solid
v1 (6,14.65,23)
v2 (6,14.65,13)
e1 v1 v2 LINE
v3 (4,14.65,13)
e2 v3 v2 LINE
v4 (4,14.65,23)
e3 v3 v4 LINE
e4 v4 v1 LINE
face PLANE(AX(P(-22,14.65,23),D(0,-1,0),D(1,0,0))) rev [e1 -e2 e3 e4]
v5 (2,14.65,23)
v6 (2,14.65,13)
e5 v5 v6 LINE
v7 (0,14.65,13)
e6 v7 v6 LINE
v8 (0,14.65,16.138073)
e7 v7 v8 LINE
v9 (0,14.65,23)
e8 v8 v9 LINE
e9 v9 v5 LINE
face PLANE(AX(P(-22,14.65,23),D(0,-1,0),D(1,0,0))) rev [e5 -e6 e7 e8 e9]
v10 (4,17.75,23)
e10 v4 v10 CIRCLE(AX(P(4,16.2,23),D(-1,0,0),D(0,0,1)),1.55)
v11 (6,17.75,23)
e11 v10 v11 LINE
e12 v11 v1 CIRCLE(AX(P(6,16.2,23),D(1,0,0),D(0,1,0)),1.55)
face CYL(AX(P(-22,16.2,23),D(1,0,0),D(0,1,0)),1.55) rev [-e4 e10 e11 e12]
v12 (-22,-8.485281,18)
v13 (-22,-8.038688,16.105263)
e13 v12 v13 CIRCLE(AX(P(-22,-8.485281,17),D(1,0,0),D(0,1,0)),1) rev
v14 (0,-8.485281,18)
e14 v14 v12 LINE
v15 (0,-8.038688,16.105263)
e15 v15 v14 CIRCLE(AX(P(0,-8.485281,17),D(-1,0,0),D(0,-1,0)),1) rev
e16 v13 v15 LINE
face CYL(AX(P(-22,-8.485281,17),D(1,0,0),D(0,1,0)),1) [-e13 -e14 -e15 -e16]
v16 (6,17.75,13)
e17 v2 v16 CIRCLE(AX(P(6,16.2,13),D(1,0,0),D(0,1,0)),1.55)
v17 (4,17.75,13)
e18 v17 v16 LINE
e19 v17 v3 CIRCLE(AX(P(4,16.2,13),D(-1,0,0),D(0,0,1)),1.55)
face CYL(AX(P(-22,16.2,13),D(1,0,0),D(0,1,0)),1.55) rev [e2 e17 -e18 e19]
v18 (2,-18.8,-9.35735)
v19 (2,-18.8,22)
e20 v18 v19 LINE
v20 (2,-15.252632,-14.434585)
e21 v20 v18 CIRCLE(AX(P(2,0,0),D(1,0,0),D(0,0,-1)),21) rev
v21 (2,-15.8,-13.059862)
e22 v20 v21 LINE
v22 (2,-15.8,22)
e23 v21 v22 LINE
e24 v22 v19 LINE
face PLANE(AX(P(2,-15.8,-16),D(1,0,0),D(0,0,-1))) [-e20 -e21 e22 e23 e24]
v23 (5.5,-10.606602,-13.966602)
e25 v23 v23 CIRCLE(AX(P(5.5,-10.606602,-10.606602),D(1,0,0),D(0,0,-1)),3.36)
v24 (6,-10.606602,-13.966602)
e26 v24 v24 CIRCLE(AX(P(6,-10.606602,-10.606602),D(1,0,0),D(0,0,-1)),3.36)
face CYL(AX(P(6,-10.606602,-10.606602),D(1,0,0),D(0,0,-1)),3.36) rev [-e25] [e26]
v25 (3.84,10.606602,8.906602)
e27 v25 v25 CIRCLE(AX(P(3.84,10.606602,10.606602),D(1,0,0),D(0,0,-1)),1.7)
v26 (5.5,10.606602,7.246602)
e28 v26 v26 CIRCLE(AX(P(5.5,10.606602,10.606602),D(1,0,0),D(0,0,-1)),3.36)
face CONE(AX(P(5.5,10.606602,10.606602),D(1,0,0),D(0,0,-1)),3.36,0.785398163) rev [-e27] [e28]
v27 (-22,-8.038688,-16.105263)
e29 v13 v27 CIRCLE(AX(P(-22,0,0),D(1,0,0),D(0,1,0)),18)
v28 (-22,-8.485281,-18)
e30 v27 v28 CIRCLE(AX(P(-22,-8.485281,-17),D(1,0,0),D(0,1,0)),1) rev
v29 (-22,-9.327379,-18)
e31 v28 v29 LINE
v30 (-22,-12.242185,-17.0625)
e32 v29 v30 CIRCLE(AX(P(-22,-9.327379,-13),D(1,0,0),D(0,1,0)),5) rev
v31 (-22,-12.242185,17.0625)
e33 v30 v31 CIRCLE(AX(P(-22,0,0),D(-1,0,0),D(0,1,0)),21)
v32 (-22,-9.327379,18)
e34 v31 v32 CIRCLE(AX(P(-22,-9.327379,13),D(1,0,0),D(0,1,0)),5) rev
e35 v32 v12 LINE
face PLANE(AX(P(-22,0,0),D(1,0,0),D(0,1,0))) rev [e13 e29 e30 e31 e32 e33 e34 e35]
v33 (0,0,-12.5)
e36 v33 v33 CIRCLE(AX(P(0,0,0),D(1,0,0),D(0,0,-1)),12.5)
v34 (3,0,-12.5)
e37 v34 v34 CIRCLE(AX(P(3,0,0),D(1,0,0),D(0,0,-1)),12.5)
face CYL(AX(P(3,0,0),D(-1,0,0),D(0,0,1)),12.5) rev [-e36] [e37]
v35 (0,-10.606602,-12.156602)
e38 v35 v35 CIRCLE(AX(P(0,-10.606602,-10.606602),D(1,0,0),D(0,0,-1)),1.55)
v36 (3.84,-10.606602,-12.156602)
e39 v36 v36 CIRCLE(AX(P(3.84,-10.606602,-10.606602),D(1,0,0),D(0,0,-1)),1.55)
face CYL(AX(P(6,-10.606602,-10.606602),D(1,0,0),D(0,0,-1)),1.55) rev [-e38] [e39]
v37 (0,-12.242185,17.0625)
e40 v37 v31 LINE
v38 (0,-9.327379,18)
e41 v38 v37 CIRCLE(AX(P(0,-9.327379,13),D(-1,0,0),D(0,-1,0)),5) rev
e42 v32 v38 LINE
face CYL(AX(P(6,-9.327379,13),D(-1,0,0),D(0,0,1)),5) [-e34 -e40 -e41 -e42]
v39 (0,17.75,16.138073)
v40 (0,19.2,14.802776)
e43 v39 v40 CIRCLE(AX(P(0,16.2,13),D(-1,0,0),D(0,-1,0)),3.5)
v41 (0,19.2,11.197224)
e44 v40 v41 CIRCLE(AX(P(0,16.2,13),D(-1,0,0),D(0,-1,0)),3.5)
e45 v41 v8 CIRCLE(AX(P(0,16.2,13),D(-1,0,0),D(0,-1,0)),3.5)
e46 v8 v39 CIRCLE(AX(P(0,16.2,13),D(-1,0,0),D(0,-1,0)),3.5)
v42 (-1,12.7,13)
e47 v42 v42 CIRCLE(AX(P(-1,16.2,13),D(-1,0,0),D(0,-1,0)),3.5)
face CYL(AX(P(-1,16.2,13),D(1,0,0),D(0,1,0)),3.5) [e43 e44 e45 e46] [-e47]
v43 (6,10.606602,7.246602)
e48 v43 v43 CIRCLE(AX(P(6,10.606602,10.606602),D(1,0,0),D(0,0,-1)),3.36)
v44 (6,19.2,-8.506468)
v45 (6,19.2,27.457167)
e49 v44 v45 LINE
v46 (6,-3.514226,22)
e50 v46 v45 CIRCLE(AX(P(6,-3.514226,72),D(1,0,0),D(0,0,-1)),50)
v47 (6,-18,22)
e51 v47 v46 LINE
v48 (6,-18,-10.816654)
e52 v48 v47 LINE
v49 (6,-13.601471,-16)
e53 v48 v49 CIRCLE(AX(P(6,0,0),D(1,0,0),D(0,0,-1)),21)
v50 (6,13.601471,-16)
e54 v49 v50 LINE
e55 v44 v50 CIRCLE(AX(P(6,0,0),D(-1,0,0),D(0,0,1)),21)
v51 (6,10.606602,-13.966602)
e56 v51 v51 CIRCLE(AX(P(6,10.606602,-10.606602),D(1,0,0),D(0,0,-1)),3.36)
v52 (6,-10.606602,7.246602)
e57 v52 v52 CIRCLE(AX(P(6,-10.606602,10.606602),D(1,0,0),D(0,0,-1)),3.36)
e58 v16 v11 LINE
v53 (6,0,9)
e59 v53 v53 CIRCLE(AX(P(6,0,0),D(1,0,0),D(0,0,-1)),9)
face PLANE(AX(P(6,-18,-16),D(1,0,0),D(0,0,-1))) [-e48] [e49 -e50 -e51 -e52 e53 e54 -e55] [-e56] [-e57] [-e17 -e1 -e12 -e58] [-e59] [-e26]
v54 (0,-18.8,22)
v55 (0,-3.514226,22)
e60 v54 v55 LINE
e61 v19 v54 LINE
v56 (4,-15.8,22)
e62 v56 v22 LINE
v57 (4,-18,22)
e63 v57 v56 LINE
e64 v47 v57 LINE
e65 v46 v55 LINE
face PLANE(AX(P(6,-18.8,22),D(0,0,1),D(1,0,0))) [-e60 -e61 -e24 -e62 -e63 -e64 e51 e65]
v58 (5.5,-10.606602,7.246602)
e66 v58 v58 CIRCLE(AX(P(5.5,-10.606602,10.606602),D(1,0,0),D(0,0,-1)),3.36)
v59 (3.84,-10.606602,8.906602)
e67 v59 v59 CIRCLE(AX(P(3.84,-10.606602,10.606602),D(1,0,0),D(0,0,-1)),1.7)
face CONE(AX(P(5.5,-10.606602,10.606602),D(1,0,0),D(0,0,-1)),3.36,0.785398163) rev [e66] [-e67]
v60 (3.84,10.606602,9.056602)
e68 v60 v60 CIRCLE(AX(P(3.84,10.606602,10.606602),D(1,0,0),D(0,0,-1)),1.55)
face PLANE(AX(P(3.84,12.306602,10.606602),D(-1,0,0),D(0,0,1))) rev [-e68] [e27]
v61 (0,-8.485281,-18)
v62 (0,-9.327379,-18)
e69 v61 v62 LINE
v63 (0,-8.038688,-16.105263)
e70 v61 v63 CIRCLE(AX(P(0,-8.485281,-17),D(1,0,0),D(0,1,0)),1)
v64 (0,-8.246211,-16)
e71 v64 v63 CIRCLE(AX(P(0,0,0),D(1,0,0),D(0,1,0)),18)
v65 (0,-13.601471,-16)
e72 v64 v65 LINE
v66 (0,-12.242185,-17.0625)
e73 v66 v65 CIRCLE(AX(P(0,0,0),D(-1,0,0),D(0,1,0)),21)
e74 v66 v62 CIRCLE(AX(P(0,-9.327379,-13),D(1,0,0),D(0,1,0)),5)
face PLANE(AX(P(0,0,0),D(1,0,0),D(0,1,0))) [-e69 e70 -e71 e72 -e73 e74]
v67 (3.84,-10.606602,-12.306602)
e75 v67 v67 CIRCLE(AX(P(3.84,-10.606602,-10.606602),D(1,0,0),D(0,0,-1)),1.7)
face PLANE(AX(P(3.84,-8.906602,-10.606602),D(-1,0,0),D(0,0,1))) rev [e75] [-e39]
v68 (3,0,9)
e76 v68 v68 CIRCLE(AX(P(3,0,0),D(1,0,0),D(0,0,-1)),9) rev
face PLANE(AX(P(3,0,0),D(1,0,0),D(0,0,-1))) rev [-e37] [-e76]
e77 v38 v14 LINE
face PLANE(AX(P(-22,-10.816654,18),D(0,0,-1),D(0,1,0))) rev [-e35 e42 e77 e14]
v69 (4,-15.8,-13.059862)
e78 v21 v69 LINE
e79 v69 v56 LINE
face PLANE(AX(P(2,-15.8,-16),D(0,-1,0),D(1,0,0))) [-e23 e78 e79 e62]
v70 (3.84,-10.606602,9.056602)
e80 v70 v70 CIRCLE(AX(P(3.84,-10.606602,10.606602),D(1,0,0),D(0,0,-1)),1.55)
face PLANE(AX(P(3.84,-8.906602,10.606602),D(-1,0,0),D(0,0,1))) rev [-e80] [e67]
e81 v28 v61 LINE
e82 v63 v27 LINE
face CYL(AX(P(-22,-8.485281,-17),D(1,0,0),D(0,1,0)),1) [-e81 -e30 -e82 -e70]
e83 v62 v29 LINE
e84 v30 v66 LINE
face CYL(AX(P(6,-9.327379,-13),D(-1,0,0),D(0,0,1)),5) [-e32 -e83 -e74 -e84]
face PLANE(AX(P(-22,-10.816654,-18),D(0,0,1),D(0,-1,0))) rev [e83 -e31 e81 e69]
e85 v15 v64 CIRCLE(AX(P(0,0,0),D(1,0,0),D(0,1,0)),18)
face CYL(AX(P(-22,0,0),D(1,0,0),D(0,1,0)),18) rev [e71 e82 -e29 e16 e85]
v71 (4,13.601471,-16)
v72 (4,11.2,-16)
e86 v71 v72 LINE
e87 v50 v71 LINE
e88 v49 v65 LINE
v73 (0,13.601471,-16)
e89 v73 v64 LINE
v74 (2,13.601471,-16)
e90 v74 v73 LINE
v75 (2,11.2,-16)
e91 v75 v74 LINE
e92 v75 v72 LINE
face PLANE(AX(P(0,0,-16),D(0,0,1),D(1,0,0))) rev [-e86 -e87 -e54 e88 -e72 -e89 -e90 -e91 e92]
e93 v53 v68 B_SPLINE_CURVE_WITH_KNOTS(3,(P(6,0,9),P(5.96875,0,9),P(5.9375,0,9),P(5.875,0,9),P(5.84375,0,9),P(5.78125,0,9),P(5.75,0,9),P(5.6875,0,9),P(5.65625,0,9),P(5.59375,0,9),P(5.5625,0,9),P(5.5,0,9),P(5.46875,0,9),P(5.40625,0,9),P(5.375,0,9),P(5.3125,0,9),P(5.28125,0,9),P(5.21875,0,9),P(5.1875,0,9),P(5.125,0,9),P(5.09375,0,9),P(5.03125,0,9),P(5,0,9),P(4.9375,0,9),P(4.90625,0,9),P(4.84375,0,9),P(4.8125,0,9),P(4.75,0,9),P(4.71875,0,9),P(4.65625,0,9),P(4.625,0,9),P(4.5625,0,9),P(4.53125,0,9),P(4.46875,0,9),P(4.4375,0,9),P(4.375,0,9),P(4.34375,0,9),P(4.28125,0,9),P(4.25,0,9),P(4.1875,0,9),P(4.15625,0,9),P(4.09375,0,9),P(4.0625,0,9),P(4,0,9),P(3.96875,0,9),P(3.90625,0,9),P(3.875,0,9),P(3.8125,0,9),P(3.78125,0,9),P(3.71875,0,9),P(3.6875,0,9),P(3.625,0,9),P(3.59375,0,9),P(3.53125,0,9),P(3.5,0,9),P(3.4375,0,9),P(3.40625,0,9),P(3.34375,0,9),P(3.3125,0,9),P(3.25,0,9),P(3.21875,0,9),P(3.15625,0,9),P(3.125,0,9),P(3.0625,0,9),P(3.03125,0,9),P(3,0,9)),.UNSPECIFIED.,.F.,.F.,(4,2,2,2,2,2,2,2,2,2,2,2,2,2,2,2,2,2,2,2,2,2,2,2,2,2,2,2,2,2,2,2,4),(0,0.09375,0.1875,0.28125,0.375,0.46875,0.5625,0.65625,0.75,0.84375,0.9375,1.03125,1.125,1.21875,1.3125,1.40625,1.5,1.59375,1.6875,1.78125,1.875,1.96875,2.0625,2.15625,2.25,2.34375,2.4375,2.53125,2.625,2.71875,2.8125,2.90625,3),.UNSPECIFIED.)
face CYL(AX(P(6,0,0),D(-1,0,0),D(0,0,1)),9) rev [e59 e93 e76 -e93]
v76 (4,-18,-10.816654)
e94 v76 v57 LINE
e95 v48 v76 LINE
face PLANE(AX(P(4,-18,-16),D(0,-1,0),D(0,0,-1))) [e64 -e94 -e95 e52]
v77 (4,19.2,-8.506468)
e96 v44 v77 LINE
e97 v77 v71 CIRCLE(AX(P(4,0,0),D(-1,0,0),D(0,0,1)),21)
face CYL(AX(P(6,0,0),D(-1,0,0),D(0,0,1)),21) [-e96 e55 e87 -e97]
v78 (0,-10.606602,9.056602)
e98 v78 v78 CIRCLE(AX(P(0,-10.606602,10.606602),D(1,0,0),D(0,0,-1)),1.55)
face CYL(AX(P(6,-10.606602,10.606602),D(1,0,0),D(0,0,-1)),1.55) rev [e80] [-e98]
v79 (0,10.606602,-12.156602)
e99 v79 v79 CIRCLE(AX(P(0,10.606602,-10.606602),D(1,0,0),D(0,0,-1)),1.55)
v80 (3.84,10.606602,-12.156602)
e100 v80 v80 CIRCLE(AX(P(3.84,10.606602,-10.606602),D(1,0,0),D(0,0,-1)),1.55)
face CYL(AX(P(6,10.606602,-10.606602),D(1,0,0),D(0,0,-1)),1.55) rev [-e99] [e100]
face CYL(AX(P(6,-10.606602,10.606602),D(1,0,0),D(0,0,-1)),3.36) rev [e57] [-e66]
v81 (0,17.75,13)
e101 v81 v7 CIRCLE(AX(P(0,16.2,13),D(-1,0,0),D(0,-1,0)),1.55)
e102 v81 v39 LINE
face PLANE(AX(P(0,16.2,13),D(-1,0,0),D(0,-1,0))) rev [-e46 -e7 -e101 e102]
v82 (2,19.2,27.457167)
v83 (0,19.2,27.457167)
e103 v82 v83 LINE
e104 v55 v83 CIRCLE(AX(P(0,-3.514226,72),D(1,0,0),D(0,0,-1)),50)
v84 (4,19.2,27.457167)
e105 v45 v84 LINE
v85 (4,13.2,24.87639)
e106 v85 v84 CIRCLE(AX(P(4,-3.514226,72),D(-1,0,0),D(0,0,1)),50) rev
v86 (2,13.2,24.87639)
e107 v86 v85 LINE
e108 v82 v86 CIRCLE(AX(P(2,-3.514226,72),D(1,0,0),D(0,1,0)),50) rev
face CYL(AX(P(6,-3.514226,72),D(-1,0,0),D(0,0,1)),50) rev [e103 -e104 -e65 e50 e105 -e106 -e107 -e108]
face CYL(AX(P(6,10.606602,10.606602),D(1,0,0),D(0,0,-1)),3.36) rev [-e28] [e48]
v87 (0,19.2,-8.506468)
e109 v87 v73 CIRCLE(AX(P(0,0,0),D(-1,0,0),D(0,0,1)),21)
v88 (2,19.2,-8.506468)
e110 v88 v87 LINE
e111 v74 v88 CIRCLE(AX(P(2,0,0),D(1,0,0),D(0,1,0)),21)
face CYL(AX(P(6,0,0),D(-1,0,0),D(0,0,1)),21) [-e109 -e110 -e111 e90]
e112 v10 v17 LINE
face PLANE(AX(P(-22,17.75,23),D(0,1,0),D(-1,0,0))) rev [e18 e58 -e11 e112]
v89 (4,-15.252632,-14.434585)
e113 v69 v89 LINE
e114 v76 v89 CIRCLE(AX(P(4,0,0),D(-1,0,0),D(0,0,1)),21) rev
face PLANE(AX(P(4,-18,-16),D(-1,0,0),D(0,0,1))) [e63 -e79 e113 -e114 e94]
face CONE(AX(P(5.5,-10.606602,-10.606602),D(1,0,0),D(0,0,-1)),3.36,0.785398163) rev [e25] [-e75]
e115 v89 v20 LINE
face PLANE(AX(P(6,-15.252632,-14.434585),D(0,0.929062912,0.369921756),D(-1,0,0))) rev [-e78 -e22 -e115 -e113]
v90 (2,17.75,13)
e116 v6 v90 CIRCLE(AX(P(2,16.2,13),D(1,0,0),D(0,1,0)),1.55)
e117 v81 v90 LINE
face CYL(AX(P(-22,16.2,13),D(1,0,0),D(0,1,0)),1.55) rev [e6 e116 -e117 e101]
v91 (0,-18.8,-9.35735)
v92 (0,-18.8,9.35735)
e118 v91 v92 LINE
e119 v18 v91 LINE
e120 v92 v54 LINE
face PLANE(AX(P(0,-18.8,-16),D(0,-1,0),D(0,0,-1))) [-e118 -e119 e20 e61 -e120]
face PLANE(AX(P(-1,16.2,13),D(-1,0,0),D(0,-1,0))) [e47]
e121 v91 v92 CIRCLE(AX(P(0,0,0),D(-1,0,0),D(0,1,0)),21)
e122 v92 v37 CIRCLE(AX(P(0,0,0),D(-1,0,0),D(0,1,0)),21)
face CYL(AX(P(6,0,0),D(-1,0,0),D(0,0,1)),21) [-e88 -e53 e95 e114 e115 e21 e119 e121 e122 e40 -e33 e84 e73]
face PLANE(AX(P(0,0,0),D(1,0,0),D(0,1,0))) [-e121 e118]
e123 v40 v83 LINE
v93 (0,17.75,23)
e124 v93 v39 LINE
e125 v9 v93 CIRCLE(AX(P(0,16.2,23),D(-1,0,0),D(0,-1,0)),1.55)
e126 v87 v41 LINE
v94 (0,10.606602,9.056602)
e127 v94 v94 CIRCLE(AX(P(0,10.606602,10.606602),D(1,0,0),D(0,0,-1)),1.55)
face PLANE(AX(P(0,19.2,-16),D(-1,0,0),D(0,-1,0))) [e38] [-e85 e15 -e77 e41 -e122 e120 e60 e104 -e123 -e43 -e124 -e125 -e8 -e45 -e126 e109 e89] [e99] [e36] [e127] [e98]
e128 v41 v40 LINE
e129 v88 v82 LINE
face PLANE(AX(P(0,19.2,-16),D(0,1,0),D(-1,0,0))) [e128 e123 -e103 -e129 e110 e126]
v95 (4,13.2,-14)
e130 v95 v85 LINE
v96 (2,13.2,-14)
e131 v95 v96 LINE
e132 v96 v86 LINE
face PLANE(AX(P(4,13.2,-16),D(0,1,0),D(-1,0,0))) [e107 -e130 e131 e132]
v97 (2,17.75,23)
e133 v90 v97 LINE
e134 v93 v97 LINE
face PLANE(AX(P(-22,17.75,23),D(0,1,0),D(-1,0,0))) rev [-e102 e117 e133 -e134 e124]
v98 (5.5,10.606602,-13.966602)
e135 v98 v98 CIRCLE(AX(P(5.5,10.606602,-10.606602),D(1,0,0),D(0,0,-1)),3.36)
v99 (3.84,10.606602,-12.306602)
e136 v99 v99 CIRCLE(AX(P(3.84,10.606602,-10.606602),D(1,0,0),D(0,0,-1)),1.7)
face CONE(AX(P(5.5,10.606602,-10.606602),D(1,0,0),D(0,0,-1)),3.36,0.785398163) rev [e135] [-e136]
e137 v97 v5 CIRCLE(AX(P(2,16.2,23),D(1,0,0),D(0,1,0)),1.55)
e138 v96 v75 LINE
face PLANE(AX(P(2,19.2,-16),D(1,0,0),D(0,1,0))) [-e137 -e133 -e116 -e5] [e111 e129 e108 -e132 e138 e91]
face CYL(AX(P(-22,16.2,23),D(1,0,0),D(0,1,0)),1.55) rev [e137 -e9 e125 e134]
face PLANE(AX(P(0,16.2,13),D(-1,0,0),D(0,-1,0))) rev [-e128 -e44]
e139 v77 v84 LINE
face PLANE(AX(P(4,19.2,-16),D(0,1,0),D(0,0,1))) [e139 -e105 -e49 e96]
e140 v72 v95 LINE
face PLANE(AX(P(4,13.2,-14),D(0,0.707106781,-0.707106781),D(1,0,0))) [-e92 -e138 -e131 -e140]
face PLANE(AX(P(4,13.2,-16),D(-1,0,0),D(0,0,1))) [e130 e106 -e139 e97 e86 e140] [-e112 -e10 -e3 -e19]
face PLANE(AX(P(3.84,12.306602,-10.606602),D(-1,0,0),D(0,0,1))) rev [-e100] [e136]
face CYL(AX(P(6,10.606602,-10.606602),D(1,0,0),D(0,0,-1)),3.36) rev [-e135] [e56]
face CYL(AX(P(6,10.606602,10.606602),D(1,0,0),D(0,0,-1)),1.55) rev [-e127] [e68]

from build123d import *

# Parameters (mm, degrees)
DODANIE_WYCI_GNI_CIE1_START = 27.457167
DODANIE_WYCI_GNI_CIE1_DEPTH = 43.457167
SZKIC2_OUTSIDE_W            = 57.065
SZKIC2_OUTSIDE_H            = 51.608
WYTNIJ_WYCI_GNI_CIE1_DEPTH  = 35.037273975
SZKIC2_4_R                  = 12.5
SZKIC2_4_R_2                = 9
WYTNIJ_WYCI_GNI_CIE2_DEPTH  = 3
SZKIC2_5_R                  = 9
WYTNIJ_WYCI_GNI_CIE3_DEPTH  = 35.037274287
SFAZOWANIE1_SIZE            = 2
DODANIE_WYCI_GNI_CIE2_START = 22
DODANIE_WYCI_GNI_CIE2_DEPTH = 22
ZAOKR_GLENIE1_START         = -22
ZAOKR_GLENIE1_DEPTH         = 22
WYTNIJ_WYCI_GNI_CIE4_DEPTH  = 45.484784375
SZKIC8_R                    = 3.5
DODANIE_WYCI_GNI_CIE3_DEPTH = 1


with BuildPart() as part:
    # Szkic1 → Dodanie-wyciągnięcie1 (new body)
    with BuildSketch(Plane.XY.offset(DODANIE_WYCI_GNI_CIE1_START)):
        Polygon((4, 13.2), (2, 13.2), (2, 19.2), (0, 19.2), (0, -18.8), (2, -18.8), (2, -15.8), (4, -15.8), (4, -18), (6, -18), (6, 19.2), (4, 19.2), align=None)
    extrude(amount=-DODANIE_WYCI_GNI_CIE1_DEPTH)

    # Szkic2 outside → Wytnij-wyciągnięcie1 (cut, through all)
    with BuildSketch(Plane(origin=(0, 0, 0), x_dir=(0, 0, -1), z_dir=(1, 0, 0))):
        with Locations((-5.7285, 0.2)):
            Rectangle(SZKIC2_OUTSIDE_W, SZKIC2_OUTSIDE_H)
        with BuildLine():
            Line((-22, -18.8), (-22, -3.514226))
            ThreePointArc((-22, -3.514226), (-23.38343065, 8.166064436), (-27.457167387, 19.2))
            Line((-27.457167387, 19.2), (8.506468127, 19.2))
            ThreePointArc((8.506468127, 19.2), (12.568915153, 16.823268763), (16, 13.601470509))
            Line((16, 13.601470509), (16, -13.601470509))
            ThreePointArc((16, -13.601470509), (12.942371407, -16.537684915), (9.357350052, -18.8))
            Line((9.357350052, -18.8), (-22, -18.8))
        make_face(mode=Mode.SUBTRACT)
    extrude(amount=WYTNIJ_WYCI_GNI_CIE1_DEPTH, mode=Mode.SUBTRACT)

    # Szkic2<4> → Wytnij-wyciągnięcie2 (cut)
    with BuildSketch(Plane(origin=(0, 0, 0), x_dir=(0, 0, -1), z_dir=(1, 0, 0))):
        Circle(SZKIC2_4_R)
        Circle(SZKIC2_4_R_2, mode=Mode.SUBTRACT)
    extrude(amount=WYTNIJ_WYCI_GNI_CIE2_DEPTH, mode=Mode.SUBTRACT)

    # Szkic2<5> → Wytnij-wyciągnięcie3 (cut, through all)
    with BuildSketch(Plane(origin=(0, 0, 0), x_dir=(0, 0, -1), z_dir=(1, 0, 0))):
        with Locations(Location((0, 0, 0), (0, 0, 180))):
            Circle(SZKIC2_5_R)
    extrude(amount=WYTNIJ_WYCI_GNI_CIE3_DEPTH, mode=Mode.SUBTRACT)

    # Sfazowanie1
    # the kernel refuses this chamfer: 2 mm, written as the material it takes off along each edge
    with BuildSketch(Plane(origin=(4, 13.2, -16), x_dir=(0, 0, 1), z_dir=(-1, 0, 0))) as sfazowanie1_piece_1:
        Polygon((SFAZOWANIE1_SIZE, 0), (0, -SFAZOWANIE1_SIZE), (0, 0), align=None)
    extrude(amount=2, mode=Mode.SUBTRACT)
    with BuildSketch(Plane(origin=(4, -15.8, -13.833293173), x_dir=(0, 0, 1), z_dir=(-1, 0, 0))) as sfazowanie1_piece_2:
        with BuildLine():
            Line((0.773430999, 0), (-0.601291335, 0.547368421))
            ThreePointArc((-0.601291335, 0.547368421), (-0.33094721, 0.295991022), (0, 0))
            Line((0, 0), (0.773430999, 0))
        make_face()
    extrude(amount=2, mode=Mode.SUBTRACT)

    # Szkic3 → Dodanie-wyciągnięcie2 (add)
    with BuildSketch(Plane.ZY.offset(DODANIE_WYCI_GNI_CIE2_START)):
        with BuildLine():
            Line((-18, -10.816653826), (-18, 0))
            ThreePointArc((-18, 0), (0, -18), (18, 0))
            Line((18, 0), (18, -10.816653826))
            ThreePointArc((18, -10.816653826), (0, -21), (-18, -10.816653826))
        make_face()
    extrude(amount=-DODANIE_WYCI_GNI_CIE2_DEPTH)

    # Zaokrąglenie1: read off the stored shape, not the designer's step
    # Zaokrąglenie1 outline → Zaokrąglenie1 (cut)
    with BuildSketch(Plane.YZ.offset(ZAOKR_GLENIE1_START)):
        with BuildLine():
            Line((-10.816653826, -18), (-9.327379053, -18))
            ThreePointArc((-9.327379053, -18), (-10.858310142, -17.759858191), (-12.242185007, -17.0625))
            ThreePointArc((-12.242185007, -17.0625), (-11.538944434, -17.545733423), (-10.816653826, -18))
        make_face()
        with BuildLine():
            ThreePointArc((-8.038687618, -16.105263158), (-7.511952847, -17.229415734), (-8.485281374, -18))
            Line((-8.485281374, -18), (0, -18))
            ThreePointArc((0, -18), (-4.12948321, -17.519913482), (-8.038687618, -16.105263158))
        make_face()
        with BuildLine():
            ThreePointArc((-10.816653826, 18), (-11.538944434, 17.545733423), (-12.242185007, 17.0625))
            ThreePointArc((-12.242185007, 17.0625), (-10.858310142, 17.759858191), (-9.327379053, 18))
            Line((-9.327379053, 18), (-10.816653826, 18))
        make_face()
        with BuildLine():
            ThreePointArc((-8.485281374, 18), (-7.511952847, 17.229415734), (-8.038687618, 16.105263158))
            ThreePointArc((-8.038687618, 16.105263158), (-4.12948321, 17.519913482), (0, 18))
            Line((0, 18), (-8.485281374, 18))
        make_face()
    extrude(amount=ZAOKR_GLENIE1_DEPTH, mode=Mode.SUBTRACT)

    # ZaawansowanyOtwór1: read off the stored shape, not the designer's step
    # ZaawansowanyOtwór1 outline → ZaawansowanyOtwór1 (revolve, cut)
    with BuildSketch(Plane(origin=(0, -10.606601718, 10.606601718), x_dir=(0, 1, 0), z_dir=(0, 0, -1))):
        Polygon((1.7, 3.84), (3.36, 5.5), (3.36, 6), (0, 6), (0, 0), (1.55, 0), (1.55, 3.84), align=None)
    revolve(axis=Axis((0, -10.606601718, 10.606601718), (1, 0, 0)), mode=Mode.SUBTRACT)

    # ZaawansowanyOtw_r1 2 outline → ZaawansowanyOtw_r1 2 (revolve, cut)
    with BuildSketch(Plane(origin=(0, -10.606601718, -10.606601718), x_dir=(0, 1, 0), z_dir=(0, 0, -1))):
        Polygon((3.36, 6), (0, 6), (0, 0), (1.55, 0), (1.55, 3.84), (1.7, 3.84), (3.36, 5.5), align=None)
    revolve(axis=Axis((0, -10.606601718, -10.606601718), (1, 0, 0)), mode=Mode.SUBTRACT)

    # ZaawansowanyOtw_r1 3 outline → ZaawansowanyOtw_r1 3 (revolve, cut)
    with BuildSketch(Plane(origin=(0, 10.606601718, -10.606601718), x_dir=(0, 1, 0), z_dir=(0, 0, -1))):
        Polygon((3.36, 6), (0, 6), (0, 0), (1.55, 0), (1.55, 3.84), (1.7, 3.84), (3.36, 5.5), align=None)
    revolve(axis=Axis((0, 10.606601718, -10.606601718), (1, 0, 0)), mode=Mode.SUBTRACT)

    # ZaawansowanyOtw_r1 4 outline → ZaawansowanyOtw_r1 4 (revolve, cut)
    with BuildSketch(Plane(origin=(0, 10.606601718, 10.606601718), x_dir=(0, 1, 0), z_dir=(0, 0, -1))):
        Polygon((3.36, 6), (0, 6), (0, 0), (1.55, 0), (1.55, 3.84), (1.7, 3.84), (3.36, 5.5), align=None)
    revolve(axis=Axis((0, 10.606601718, 10.606601718), (1, 0, 0)), mode=Mode.SUBTRACT)

    # Szkic7 → Wytnij-wyciągnięcie4 (cut, through all)
    with BuildSketch(Plane(origin=(6, 0, 0), x_dir=(0, 0, -1), z_dir=(1, 0, 0))):
        with BuildLine():
            Line((-23, 17.75), (-13, 17.75))
            ThreePointArc((-13, 17.75), (-11.45, 16.2), (-13, 14.65))
            Line((-13, 14.65), (-23, 14.65))
            ThreePointArc((-23, 14.65), (-24.55, 16.2), (-23, 17.75))
        make_face()
    extrude(amount=-WYTNIJ_WYCI_GNI_CIE4_DEPTH, mode=Mode.SUBTRACT)

    # Szkic8 → Dodanie-wyciągnięcie3 (add)
    with BuildSketch(Plane.ZY):
        with Locations(Location((13, 16.2, 0), (0, 0, 58.997280866))):
            Circle(SZKIC8_R)
    extrude(amount=DODANIE_WYCI_GNI_CIE3_DEPTH)


solid = part.part
